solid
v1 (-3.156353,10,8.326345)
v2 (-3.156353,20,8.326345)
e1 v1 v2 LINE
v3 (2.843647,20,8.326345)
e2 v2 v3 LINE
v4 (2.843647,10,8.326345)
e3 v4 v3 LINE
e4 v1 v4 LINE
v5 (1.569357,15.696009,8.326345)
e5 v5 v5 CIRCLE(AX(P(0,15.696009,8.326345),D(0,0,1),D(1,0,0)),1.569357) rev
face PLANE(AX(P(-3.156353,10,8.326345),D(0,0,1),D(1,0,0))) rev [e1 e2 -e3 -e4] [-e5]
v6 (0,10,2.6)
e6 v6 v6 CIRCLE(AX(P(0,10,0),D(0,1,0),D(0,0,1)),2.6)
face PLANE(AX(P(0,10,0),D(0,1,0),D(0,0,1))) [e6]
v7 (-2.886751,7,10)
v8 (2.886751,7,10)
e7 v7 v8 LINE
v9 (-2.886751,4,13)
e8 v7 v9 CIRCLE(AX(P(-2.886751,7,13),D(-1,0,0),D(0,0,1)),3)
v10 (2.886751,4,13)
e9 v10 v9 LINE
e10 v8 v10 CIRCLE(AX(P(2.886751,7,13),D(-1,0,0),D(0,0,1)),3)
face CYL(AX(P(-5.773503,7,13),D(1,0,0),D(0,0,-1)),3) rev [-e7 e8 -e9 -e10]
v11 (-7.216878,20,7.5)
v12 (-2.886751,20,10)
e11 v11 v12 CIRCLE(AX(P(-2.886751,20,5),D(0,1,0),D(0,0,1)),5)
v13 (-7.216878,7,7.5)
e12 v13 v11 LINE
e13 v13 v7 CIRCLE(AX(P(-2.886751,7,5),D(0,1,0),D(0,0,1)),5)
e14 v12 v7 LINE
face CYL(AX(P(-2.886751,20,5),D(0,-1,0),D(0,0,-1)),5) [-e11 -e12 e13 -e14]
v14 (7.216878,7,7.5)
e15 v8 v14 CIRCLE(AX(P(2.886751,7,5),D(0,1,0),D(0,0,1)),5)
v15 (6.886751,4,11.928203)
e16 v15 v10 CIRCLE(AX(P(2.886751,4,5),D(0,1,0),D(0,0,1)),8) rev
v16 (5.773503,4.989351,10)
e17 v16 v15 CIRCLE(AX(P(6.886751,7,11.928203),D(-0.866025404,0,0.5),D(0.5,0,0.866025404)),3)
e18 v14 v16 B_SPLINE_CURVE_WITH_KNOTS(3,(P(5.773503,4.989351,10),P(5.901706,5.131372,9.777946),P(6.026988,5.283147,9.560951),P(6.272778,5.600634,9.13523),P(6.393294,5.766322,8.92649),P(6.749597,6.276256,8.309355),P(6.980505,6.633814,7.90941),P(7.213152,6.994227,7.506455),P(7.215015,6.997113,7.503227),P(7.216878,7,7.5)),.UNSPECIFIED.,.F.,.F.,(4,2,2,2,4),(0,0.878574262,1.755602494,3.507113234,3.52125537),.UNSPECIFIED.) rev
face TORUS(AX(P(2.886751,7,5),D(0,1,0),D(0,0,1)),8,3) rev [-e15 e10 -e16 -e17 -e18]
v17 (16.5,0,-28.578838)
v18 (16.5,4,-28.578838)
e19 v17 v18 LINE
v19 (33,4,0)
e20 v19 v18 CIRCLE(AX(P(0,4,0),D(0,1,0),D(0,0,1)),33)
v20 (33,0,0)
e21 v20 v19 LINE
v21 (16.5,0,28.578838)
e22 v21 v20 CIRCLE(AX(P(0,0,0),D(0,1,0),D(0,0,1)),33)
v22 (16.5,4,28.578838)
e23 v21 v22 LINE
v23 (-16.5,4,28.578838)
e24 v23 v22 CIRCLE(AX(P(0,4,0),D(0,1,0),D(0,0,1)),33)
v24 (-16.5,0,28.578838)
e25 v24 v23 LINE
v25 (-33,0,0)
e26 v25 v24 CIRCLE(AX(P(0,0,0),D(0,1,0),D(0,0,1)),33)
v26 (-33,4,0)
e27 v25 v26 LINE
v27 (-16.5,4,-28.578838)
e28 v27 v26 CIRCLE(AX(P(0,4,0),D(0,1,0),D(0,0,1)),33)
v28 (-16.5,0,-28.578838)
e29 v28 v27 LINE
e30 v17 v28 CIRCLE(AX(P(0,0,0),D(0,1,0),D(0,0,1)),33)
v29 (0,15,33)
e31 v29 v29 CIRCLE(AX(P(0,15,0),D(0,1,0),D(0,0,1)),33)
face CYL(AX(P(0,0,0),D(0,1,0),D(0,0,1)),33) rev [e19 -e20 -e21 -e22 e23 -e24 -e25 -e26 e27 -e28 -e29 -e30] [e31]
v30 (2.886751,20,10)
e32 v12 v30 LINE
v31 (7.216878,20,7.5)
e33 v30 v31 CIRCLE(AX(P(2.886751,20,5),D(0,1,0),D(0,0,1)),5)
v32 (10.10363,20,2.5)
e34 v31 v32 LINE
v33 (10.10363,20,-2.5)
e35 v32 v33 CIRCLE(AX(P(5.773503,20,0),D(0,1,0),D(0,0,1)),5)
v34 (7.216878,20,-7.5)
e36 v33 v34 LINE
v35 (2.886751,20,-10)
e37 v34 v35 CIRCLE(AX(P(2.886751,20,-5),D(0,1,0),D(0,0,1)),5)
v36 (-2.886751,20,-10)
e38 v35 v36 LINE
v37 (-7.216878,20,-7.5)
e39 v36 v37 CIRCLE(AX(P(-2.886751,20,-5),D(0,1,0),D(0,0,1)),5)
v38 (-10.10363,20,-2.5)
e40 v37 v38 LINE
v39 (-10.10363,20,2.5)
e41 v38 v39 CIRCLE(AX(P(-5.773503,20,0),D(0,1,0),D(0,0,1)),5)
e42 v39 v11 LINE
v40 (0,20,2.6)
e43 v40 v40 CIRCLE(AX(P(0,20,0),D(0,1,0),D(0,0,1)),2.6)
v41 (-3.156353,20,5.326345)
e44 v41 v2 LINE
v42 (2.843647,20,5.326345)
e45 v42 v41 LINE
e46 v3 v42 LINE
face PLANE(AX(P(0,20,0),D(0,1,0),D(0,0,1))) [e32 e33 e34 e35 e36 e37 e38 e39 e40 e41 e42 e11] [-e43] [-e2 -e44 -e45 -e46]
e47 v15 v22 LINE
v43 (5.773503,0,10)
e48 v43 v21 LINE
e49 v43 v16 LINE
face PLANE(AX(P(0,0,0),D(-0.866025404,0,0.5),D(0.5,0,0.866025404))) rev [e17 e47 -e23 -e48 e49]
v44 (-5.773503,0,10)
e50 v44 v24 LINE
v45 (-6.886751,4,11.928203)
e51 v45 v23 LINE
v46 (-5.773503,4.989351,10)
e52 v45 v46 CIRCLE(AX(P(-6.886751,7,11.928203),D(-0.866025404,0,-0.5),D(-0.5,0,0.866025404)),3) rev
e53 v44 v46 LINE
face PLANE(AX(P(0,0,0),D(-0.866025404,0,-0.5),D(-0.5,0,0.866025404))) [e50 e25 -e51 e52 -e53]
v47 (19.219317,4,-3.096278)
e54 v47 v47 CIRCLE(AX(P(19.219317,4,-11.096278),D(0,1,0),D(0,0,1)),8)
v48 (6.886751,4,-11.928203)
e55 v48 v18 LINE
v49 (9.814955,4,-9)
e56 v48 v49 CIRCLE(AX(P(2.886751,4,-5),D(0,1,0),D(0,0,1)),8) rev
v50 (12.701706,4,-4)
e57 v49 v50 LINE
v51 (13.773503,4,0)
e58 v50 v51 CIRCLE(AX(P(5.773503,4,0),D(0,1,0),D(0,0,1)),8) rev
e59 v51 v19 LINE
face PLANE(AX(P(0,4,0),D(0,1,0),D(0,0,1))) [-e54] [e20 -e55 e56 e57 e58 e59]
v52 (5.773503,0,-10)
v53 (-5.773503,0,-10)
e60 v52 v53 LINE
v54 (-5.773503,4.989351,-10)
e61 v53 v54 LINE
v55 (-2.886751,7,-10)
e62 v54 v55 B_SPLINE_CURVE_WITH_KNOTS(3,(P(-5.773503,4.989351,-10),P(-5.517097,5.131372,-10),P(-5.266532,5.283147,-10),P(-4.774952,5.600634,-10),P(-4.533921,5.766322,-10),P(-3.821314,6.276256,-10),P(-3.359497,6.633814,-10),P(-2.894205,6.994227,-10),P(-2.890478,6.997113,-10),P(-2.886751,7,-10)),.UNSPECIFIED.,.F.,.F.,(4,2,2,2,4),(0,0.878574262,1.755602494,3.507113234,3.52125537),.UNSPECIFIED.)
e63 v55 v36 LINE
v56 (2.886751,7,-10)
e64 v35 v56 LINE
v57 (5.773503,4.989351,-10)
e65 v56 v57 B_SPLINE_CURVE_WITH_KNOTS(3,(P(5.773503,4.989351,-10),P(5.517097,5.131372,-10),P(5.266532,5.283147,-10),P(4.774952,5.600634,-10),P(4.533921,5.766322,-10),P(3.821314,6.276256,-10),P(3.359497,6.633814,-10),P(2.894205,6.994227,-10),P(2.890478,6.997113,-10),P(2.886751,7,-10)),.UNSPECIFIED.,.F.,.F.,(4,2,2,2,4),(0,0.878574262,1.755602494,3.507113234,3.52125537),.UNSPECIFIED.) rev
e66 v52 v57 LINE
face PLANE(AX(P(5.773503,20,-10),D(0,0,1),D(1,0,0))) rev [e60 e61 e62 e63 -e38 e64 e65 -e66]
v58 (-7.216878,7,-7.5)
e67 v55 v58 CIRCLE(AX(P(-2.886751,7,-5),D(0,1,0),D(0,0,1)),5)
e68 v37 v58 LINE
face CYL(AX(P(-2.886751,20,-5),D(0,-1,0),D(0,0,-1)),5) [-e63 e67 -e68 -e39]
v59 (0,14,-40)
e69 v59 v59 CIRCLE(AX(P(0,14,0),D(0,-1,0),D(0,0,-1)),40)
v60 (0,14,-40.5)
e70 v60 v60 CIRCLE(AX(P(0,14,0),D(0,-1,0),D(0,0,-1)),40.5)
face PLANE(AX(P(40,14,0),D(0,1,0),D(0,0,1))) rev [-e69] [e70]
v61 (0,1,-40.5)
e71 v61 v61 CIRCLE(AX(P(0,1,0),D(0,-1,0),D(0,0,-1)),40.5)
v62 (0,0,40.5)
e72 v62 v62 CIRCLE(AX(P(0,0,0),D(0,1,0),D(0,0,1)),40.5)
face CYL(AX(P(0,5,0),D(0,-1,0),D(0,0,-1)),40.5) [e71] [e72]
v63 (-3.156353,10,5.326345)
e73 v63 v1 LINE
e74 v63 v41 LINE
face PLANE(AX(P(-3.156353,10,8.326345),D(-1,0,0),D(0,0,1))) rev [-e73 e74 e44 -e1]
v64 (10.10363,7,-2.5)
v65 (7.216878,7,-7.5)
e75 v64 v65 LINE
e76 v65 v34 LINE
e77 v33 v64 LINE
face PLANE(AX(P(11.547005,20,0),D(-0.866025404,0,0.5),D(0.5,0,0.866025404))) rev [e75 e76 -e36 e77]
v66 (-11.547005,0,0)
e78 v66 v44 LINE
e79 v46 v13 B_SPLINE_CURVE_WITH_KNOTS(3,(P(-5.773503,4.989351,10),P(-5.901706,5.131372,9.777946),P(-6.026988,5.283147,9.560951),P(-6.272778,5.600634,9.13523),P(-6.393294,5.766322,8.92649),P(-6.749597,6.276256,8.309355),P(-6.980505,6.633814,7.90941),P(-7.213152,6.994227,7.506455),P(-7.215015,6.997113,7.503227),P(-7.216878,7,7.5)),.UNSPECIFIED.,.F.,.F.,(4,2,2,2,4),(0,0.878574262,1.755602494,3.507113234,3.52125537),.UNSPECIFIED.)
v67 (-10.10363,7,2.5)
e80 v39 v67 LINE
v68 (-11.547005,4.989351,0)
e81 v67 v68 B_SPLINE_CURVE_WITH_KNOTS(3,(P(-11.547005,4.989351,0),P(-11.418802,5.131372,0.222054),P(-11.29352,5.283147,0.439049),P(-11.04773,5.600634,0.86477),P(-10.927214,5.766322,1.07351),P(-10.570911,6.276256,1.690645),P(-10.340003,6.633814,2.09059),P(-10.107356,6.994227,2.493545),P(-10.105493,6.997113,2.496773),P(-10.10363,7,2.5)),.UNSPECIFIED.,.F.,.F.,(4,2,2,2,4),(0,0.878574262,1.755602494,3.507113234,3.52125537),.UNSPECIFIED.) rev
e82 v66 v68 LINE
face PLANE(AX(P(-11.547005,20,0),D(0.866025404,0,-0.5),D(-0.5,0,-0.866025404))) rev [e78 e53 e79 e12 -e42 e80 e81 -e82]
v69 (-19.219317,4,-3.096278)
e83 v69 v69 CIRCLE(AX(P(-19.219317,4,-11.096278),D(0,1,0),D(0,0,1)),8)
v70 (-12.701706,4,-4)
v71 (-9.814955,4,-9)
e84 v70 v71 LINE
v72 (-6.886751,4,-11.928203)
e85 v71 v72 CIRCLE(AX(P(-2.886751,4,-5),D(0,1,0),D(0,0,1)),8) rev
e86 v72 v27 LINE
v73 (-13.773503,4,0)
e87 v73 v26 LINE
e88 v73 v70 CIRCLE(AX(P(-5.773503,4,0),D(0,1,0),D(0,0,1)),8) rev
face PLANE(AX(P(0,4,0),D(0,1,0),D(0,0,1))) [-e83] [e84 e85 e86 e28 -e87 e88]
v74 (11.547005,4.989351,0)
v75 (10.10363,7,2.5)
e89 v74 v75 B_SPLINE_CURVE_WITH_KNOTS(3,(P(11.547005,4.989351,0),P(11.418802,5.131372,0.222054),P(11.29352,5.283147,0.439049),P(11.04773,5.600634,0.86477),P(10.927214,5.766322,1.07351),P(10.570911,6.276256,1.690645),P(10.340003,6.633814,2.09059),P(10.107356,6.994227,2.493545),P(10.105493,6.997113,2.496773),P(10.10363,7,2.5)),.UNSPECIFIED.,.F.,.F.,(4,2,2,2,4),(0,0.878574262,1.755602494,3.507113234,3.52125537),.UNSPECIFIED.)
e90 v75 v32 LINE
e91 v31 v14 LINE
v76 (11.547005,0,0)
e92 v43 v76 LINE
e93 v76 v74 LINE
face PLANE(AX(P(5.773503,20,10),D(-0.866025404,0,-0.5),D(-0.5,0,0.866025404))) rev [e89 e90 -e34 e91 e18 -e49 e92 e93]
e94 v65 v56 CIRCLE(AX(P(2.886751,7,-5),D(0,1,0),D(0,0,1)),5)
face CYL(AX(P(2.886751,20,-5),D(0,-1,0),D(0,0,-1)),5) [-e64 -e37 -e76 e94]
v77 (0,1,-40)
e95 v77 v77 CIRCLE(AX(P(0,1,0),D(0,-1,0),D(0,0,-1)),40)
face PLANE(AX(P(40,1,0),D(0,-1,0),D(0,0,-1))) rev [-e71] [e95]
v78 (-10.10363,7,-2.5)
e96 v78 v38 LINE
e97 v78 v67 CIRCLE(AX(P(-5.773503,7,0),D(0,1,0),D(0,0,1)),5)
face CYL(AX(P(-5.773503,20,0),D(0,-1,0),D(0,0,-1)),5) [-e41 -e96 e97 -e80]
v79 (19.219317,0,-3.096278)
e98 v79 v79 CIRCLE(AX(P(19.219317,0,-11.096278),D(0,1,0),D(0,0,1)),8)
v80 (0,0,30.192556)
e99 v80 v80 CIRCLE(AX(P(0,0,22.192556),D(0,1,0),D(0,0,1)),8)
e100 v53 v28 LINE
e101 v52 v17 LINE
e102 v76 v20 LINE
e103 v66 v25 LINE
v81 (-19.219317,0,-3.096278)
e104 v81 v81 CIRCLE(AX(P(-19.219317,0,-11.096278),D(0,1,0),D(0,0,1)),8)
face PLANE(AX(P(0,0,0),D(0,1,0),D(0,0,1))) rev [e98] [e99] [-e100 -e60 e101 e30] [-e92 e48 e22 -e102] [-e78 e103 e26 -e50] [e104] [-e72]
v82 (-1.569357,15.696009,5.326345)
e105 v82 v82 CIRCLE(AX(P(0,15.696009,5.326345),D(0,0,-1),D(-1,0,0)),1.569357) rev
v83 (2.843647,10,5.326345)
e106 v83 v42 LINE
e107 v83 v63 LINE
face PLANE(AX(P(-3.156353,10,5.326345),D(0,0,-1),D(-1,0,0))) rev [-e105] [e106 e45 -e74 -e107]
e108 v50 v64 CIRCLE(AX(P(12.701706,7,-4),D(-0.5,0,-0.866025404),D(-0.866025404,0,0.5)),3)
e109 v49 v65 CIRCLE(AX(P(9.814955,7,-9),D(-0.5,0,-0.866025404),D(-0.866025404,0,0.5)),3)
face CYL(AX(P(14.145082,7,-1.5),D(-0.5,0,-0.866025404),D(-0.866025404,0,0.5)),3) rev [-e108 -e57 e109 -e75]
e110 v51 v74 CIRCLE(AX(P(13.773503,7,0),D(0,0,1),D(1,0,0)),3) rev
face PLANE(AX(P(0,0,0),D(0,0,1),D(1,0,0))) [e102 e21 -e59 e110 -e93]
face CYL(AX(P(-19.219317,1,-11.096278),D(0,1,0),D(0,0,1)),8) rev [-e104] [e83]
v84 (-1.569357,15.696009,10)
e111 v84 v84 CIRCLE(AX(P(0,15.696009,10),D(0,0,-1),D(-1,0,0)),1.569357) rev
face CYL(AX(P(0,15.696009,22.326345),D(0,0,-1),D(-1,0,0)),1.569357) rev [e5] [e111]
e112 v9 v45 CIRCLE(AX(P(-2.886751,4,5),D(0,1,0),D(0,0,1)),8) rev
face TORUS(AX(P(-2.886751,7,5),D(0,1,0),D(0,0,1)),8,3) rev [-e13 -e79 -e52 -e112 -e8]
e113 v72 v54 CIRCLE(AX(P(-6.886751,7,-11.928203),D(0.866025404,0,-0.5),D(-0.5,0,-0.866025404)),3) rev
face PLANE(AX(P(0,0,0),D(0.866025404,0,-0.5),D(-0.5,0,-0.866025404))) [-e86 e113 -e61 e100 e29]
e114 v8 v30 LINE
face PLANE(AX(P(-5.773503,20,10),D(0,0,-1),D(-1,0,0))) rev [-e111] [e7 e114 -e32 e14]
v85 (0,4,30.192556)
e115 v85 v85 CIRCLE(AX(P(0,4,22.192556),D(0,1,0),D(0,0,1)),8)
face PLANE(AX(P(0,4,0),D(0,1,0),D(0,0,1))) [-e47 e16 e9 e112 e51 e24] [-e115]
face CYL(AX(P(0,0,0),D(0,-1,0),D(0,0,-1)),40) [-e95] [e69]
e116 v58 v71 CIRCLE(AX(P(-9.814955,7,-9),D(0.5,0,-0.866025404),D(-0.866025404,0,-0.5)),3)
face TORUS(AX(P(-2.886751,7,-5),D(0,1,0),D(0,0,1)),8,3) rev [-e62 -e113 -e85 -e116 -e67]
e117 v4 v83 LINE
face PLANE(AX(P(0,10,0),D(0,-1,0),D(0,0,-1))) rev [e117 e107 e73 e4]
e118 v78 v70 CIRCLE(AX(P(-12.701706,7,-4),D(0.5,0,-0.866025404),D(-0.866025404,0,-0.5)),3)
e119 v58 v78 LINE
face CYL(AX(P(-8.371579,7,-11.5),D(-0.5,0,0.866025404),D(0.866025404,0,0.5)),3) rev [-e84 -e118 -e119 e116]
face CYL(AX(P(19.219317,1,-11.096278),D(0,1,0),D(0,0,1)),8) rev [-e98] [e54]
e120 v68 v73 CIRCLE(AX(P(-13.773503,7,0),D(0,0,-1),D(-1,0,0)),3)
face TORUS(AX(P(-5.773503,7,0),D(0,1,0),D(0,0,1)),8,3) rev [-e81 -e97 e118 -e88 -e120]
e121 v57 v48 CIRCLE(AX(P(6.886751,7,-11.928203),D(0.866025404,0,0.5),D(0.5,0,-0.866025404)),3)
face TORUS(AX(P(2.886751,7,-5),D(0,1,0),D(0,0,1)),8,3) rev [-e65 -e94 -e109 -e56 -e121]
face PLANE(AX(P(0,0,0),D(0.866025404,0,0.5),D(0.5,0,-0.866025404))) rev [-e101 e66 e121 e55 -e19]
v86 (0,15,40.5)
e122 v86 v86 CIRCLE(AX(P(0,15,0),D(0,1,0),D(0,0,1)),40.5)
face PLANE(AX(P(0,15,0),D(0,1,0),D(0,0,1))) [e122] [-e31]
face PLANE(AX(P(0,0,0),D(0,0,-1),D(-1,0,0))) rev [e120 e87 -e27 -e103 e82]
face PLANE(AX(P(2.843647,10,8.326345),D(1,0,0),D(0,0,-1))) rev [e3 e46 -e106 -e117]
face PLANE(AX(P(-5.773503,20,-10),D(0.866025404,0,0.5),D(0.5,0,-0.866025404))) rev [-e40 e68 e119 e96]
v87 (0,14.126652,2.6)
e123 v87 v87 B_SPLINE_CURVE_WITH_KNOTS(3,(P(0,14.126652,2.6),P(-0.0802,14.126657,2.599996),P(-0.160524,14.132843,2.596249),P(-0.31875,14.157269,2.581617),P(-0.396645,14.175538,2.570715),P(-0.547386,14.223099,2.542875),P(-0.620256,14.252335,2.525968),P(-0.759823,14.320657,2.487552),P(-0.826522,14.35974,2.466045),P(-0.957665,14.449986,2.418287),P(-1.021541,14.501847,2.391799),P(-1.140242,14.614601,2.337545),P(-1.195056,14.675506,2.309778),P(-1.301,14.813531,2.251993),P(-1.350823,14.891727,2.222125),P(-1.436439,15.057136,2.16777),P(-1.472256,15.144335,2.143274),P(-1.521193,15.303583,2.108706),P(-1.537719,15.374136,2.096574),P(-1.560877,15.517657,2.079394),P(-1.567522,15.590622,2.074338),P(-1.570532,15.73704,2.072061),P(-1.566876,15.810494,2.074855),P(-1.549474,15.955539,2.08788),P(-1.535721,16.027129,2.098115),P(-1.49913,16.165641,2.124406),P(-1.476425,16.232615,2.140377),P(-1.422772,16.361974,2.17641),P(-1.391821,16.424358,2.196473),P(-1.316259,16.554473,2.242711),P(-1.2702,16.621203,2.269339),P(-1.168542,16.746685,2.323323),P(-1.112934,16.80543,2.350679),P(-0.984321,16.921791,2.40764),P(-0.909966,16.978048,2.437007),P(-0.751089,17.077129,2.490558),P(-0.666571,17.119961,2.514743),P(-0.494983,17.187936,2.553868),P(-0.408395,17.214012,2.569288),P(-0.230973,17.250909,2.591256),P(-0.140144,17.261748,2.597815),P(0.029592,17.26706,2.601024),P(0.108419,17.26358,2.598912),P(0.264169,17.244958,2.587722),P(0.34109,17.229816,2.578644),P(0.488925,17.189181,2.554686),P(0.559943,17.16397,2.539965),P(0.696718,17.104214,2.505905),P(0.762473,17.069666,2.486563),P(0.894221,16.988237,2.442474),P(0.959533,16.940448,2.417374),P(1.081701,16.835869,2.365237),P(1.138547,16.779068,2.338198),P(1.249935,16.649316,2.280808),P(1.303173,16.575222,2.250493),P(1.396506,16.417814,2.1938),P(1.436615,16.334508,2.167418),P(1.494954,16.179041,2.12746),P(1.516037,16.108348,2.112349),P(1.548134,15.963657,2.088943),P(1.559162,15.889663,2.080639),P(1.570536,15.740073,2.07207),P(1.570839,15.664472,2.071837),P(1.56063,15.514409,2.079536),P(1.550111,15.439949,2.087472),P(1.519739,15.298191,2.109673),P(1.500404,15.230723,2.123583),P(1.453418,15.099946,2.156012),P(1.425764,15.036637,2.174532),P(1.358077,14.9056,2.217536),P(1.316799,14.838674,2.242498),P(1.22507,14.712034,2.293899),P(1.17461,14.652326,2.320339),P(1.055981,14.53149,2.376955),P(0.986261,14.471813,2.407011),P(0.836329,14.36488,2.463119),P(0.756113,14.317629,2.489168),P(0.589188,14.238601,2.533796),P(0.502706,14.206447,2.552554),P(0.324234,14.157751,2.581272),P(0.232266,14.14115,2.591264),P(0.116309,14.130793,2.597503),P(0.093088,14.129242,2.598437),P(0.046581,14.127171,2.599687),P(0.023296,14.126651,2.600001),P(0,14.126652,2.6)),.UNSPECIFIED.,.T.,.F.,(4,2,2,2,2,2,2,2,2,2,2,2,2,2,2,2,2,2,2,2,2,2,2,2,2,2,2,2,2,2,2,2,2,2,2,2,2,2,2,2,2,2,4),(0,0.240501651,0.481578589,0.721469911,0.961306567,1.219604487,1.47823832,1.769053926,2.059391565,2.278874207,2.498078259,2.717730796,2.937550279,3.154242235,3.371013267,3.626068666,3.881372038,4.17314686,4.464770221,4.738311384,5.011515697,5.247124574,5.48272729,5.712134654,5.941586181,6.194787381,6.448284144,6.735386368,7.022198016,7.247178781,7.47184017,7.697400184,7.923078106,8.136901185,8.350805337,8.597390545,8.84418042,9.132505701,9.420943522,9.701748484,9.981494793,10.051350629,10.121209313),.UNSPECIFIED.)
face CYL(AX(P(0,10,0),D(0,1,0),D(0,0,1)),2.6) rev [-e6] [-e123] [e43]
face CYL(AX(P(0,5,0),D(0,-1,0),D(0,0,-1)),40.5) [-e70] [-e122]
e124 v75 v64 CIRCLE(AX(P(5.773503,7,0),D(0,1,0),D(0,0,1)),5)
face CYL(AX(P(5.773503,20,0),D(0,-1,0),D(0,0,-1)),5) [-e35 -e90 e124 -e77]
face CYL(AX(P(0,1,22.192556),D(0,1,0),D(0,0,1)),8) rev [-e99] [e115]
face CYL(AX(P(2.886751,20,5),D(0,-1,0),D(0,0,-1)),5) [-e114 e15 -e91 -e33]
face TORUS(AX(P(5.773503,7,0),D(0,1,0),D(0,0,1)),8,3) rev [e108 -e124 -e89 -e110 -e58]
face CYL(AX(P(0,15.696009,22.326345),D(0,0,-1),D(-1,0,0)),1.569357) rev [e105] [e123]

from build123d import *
from build123d.topology import SkipClean

# Parameters (mm, degrees)
SKETCH1_R                = 40.5
BOSS_EXTRUDE16_DEPTH     = 5
SKETCH1_23_R             = 5
BOSS_EXTRUDE17_DEPTH     = 5
CUT_EXTRUDE6_DEPTH       = 15
CUT_EXTRUDE7_DEPTH       = 5
CUT_EXTRUDE8_DEPTH       = 5
CUT_EXTRUDE9_DEPTH       = 5
BOSS_EXTRUDE19_DEPTH     = 5
CUT_EXTRUDE14_DEPTH      = 1
SKETCH24_R               = 8
CUT_EXTRUDE15_DEPTH      = 4
SKETCH24_2_R             = 8
CUT_EXTRUDE16_DEPTH      = 6
BOSS_EXTRUDE21_START     = -1
SKETCH30_R               = 40
SKETCH30_R_2             = 33
BOSS_EXTRUDE21_DEPTH     = 1
BOSS_EXTRUDE22_DEPTH     = 15
SKETCH33_R               = 2.6
CUT_EXTRUDE17_DEPTH      = 10
SKETCH35_W               = 6
SKETCH35_H               = 3
CUT_EXTRUDE18_DEPTH      = 10
CUT_EXTRUDE19_DEPTH      = 17
CUT_EXTRUDE19_DEPTH_BACK = 5
SKETCH36_R               = 1.569356798
SKETCH37_R               = 40.5
SKETCH37_R_2             = 33
BOSS_EXTRUDE23_DEPTH     = 10
SKETCH39_W               = 0.5
SKETCH39_H               = 13
BOSS_EXTRUDE25_DEPTH     = 5
FILLET2_R                = 5
FILLET3_R                = 3


with BuildPart() as part:
    # Sketch1 → Boss-Extrude16 (new body)
    with BuildSketch(Plane(origin=(0, 0, 0), x_dir=(1, 0, 0), z_dir=(0, 1, 0))):
        with Locations(Location((0, 0, 0), (0, 0, 270))):
            Circle(SKETCH1_R)
    extrude(amount=BOSS_EXTRUDE16_DEPTH)

    # Sketch1<23> → Boss-Extrude17 (add)
    with BuildSketch(Plane(origin=(0, 0, 0), x_dir=(1, 0, 0), z_dir=(0, 1, 0))):
        Circle(SKETCH1_23_R)
    extrude(amount=BOSS_EXTRUDE17_DEPTH)

    # Sketch1<29> → Cut-Extrude6 (cut)
    with BuildSketch(Plane(origin=(0, 0, 0), x_dir=(1, 0, 0), z_dir=(0, 1, 0))):
        with BuildLine():
            ThreePointArc((1.209994132, 1.5924554), (0.148641183, -1.994468801), (-1.43267703, 1.395505833))
            Line((-1.43267703, 1.395505833), (1.209994132, 1.5924554))
        make_face()
    extrude(amount=CUT_EXTRUDE6_DEPTH, mode=Mode.SUBTRACT)

    # Sketch13 → Cut-Extrude7 (cut)
    with BuildSketch(Plane(origin=(0, 5, 0), x_dir=(1, 0, 0), z_dir=(0, 1, 0))):
        with BuildLine():
            Line((-16.5, 28.578838325), (-3.827980833, 6.630257293))
            Line((-3.827980833, 6.630257293), (-3e-09, 6.630257293))
            Line((-3e-09, 6.630257293), (3.827980833, 6.630257293))
            Line((3.827980833, 6.630257293), (16.5, 28.578838325))
            ThreePointArc((16.5, 28.578838325), (8.541028451, 31.875552278), (-7.8e-08, 33))
            ThreePointArc((-7.8e-08, 33), (-8.541028526, 31.875552257), (-16.5, 28.578838325))
        make_face()
    extrude(amount=-CUT_EXTRUDE7_DEPTH, mode=Mode.SUBTRACT)

    # Sketch13<4> → Cut-Extrude8 (cut)
    with BuildSketch(Plane(origin=(0, 5, 0), x_dir=(1, 0, 0), z_dir=(0, 1, 0))):
        with BuildLine():
            Line((-5.741971189, -3.315128752), (-7.655961666, 0))
            Line((-7.655961666, 0), (-33, 0))
            ThreePointArc((-33, 0), (-31.875552302, -8.541028358), (-28.578838459, -16.499999767))
            ThreePointArc((-28.578838459, -16.499999767), (-23.334523874, -23.334523684), (-16.5, -28.578838325))
            Line((-16.5, -28.578838325), (-3.827980833, -6.630257293))
            Line((-3.827980833, -6.630257293), (-5.741971189, -3.315128752))
        make_face()
    extrude(amount=-CUT_EXTRUDE8_DEPTH, mode=Mode.SUBTRACT)

    # Sketch13<5> → Cut-Extrude9 (cut)
    with BuildSketch(Plane(origin=(0, 5, 0), x_dir=(1, 0, 0), z_dir=(0, 1, 0))):
        with BuildLine():
            Line((33, 0), (7.655961666, 0))
            Line((7.655961666, 0), (5.741971178, -3.31512877))
            Line((5.741971178, -3.31512877), (3.827980833, -6.630257293))
            Line((3.827980833, -6.630257293), (16.5, -28.578838325))
            ThreePointArc((16.5, -28.578838325), (23.334523686, -23.334523872), (28.578838193, -16.500000228))
            ThreePointArc((28.578838193, -16.500000228), (31.875552233, -8.541028616), (33, 0))
        make_face()
    extrude(amount=-CUT_EXTRUDE9_DEPTH, mode=Mode.SUBTRACT)

    # Sketch1<32> → Boss-Extrude19 (add)
    with BuildSketch(Plane(origin=(0, 0, 0), x_dir=(1, 0, 0), z_dir=(0, 1, 0))):
        with BuildLine():
            ThreePointArc((1.209994132, 1.5924554), (0.148641183, -1.994468801), (-1.43267703, 1.395505833))
            Line((-1.43267703, 1.395505833), (1.209994132, 1.5924554))
        make_face()
    extrude(amount=BOSS_EXTRUDE19_DEPTH)

    # Sketch13<11> → Cut-Extrude14 (cut)
    with BuildSketch(Plane(origin=(0, 5, 0), x_dir=(1, 0, 0), z_dir=(0, 1, 0))):
        with BuildLine():
            Line((-7.655961666, 0), (-3.827980833, 6.630257293))
            Line((-3.827980833, 6.630257293), (-16.5, 28.578838325))
            ThreePointArc((-16.5, 28.578838325), (-28.578838325, 16.5), (-33, 0))
            Line((-33, 0), (-7.655961666, 0))
        make_face()
        with BuildLine():
            Line((16.5, 28.578838325), (3.827980833, 6.630257293))
            Line((3.827980833, 6.630257293), (7.655961666, 0))
            Line((7.655961666, 0), (33, 0))
            ThreePointArc((33, 0), (28.578838325, 16.5), (16.5, 28.578838325))
        make_face()
        with BuildLine():
            Line((3.827980833, -6.630257293), (-3.827980833, -6.630257293))
            Line((-3.827980833, -6.630257293), (-16.5, -28.578838325))
            ThreePointArc((-16.5, -28.578838325), (0, -33), (16.5, -28.578838325))
            Line((16.5, -28.578838325), (3.827980833, -6.630257293))
        make_face()
    extrude(amount=-CUT_EXTRUDE14_DEPTH, mode=Mode.SUBTRACT)

    # Sketch24 → Cut-Extrude15 (cut)
    with BuildSketch(Plane(origin=(0, 5, 0), x_dir=(1, 0, 0), z_dir=(0, 1, 0))):
        with Locations(Location((0, -22.192555868, 0), (0, 0, 270))):
            Circle(SKETCH24_R)
        with Locations(Location((19.219317157, 11.096277934, 0), (0, 0, 270))):
            Circle(SKETCH24_R)
        with Locations(Location((-19.219317157, 11.096277934, 0), (0, 0, 270))):
            Circle(SKETCH24_R)
    extrude(amount=-CUT_EXTRUDE15_DEPTH, mode=Mode.SUBTRACT)

    # Sketch24<2> → Cut-Extrude16 (cut)
    with BuildSketch(Plane(origin=(0, 5, 0), x_dir=(1, 0, 0), z_dir=(0, 1, 0))):
        with Locations(Location((0, -22.192555868, 0), (0, 0, 270))):
            Circle(SKETCH24_2_R)
        with Locations(Location((19.219317157, 11.096277934, 0), (0, 0, 270))):
            Circle(SKETCH24_2_R)
        with Locations(Location((-19.219317157, 11.096277934, 0), (0, 0, 270))):
            Circle(SKETCH24_2_R)
    extrude(amount=-CUT_EXTRUDE16_DEPTH, mode=Mode.SUBTRACT)

    # Sketch30 → Boss-Extrude21 (add)
    with BuildSketch(Plane.XZ.offset(BOSS_EXTRUDE21_START)):
        Circle(SKETCH30_R)
        with Locations(Location((0, 0, 0), (0, 0, 90))):
            Circle(SKETCH30_R_2, mode=Mode.SUBTRACT)
    extrude(amount=BOSS_EXTRUDE21_DEPTH)

    # Sketch31 → Boss-Extrude22 (add)
    with BuildSketch(Plane(origin=(0, 5, 0), x_dir=(1, 0, 0), z_dir=(0, 1, 0))):
        Polygon((11.547005384, 0), (5.773502692, 10), (-5.773502692, 10), (-11.547005384, 0), (-5.773502692, -10), (5.773502692, -10), align=None)
    extrude(amount=BOSS_EXTRUDE22_DEPTH)

    # Sketch33 → Cut-Extrude17 (cut)
    with BuildSketch(Plane(origin=(0, 20, 0), x_dir=(1, 0, 0), z_dir=(0, 1, 0))):
        with Locations(Location((0, 0, 0), (0, 0, 270))):
            Circle(SKETCH33_R)
    extrude(amount=-CUT_EXTRUDE17_DEPTH, mode=Mode.SUBTRACT)

    # Sketch35 → Cut-Extrude18 (cut)
    with BuildSketch(Plane(origin=(0, 20, 0), x_dir=(1, 0, 0), z_dir=(0, 1, 0))):
        with Locations((-0.156352746, -6.826345259)):
            Rectangle(SKETCH35_W, SKETCH35_H)
    extrude(amount=-CUT_EXTRUDE18_DEPTH, mode=Mode.SUBTRACT)

    # Sketch36 → Cut-Extrude19 (cut, two sides: drawn at the far end of the back side and taken through both)
    with BuildSketch(Plane.XY.offset(5.326345259).offset(-CUT_EXTRUDE19_DEPTH_BACK)):
        with Locations(Location((0, 15.69600898, 0), (0, 0, 180))):
            Circle(SKETCH36_R)
    extrude(amount=CUT_EXTRUDE19_DEPTH + CUT_EXTRUDE19_DEPTH_BACK, mode=Mode.SUBTRACT)

    # Sketch37 → Boss-Extrude23 (add)
    with SkipClean():  # the faces are left unmerged after this step: merging them gives an invalid solid
        with BuildSketch(Plane(origin=(0, 5, 0), x_dir=(1, 0, 0), z_dir=(0, 1, 0))):
            with Locations(Location((0, 0, 0), (0, 0, 270))):
                Circle(SKETCH37_R)
            with Locations(Location((0, 0, 0), (0, 0, 270))):
                Circle(SKETCH37_R_2, mode=Mode.SUBTRACT)
        extrude(amount=BOSS_EXTRUDE23_DEPTH)
    add(part.part.scale(1), mode=Mode.REPLACE)  # the faces are merged on a copy

    # Sketch39 → Cut-Revolve1 (revolve, cut)
    with BuildSketch(Plane.XY, mode=Mode.PRIVATE) as cut_revolve1_sk:
        with Locations((40.25, 7.5)):
            Rectangle(SKETCH39_W, SKETCH39_H)
    revolve(cut_revolve1_sk.sketch.rotate(Axis((0, 0, 0), (0, 1, 0)), 90), axis=Axis((0, 0, 0), (0, 1, 0)), mode=Mode.SUBTRACT)

    # Sketch31<3> → Boss-Extrude25 (add)
    with BuildSketch(Plane(origin=(0, 5, 0), x_dir=(1, 0, 0), z_dir=(0, 1, 0))):
        Polygon((11.547005384, 0), (5.773502692, 10), (-5.773502692, 10), (-11.547005384, 0), (-5.773502692, -10), (5.773502692, -10), align=None)
    extrude(amount=-BOSS_EXTRUDE25_DEPTH)

    # Fillet2
    fillet2_edges = [part.edges().sort_by_distance(p)[0] for p in [
        (5.773502692, 12, 10),
        (11.547005384, 12, 0),
        (5.773502692, 12, -10),
        (-5.773502692, 12, -10),
        (-11.547005384, 12, 0),
        (-5.773502692, 12, 10),
    ]]
    fillet(fillet2_edges, radius=FILLET2_R)

    # Fillet3
    # the kernel refuses this fillet: 3 mm, written as the material it adds along each edge
    with BuildSketch(Plane(origin=(2.886751346, 4, 5), x_dir=(0, 0, 1), z_dir=(-1, 0, 0))) as fillet3_piece_1_section:
        with BuildLine():
            CenterArc((5 + FILLET3_R, FILLET3_R), FILLET3_R, 180, 90)
            Line((5 + FILLET3_R, 0), (5, 0))
            Line((5, 0), (5, FILLET3_R))
        make_face()
    fillet3_piece_1 = revolve(axis=Axis((2.886751346, 4, 5), (0, 1, 0)), revolution_arc=145.959010994, mode=Mode.PRIVATE)
    fillet3_piece_1 = split(fillet3_piece_1, bisect_by=Plane(origin=(5.63089288, 5.027584856, 10.247007441), z_dir=(-0.8660254037844389, 0, -0.4999999999999996)), keep=Keep.TOP, mode=Mode.PRIVATE)
    add(fillet3_piece_1)
    with BuildSketch(Plane(origin=(2.886751346, 4, 5), x_dir=(0, 0, 1), z_dir=(-1, 0, 0))) as fillet3_piece_2_section:
        with BuildLine():
            CenterArc((5 + FILLET3_R, FILLET3_R), FILLET3_R, 180, 90)
            Line((5 + FILLET3_R, 0), (5, 0))
            Line((5, 0), (5, FILLET3_R))
        make_face()
    fillet3_piece_2 = revolve(axis=Axis((2.886751346, 4, 5), (0, 1, 0)), revolution_arc=145.959010994, mode=Mode.PRIVATE)
    fillet3_piece_2 = split(fillet3_piece_2, bisect_by=Plane(origin=(6.175606905, 4.190788344, 10.696464926), z_dir=(-0.8660254037844383, 0, 0.5000000000000007)), keep=Keep.TOP, mode=Mode.PRIVATE)
    add(fillet3_piece_2)
    with BuildSketch(Plane(origin=(-2.886751346, 4, 10), x_dir=(0, 1, 0), z_dir=(1, 0, 0)), Plane(origin=(-7.216878365, 4, -7.5), x_dir=(0, 1, 0), z_dir=(-0.49999999999999983, 0, 0.8660254037844388)), Plane(origin=(10.103629711, 4, -2.5), x_dir=(0, 1, 0), z_dir=(-0.5, 0, -0.8660254037844387))) as fillet3_piece_3:
        with BuildLine():
            CenterArc((FILLET3_R, FILLET3_R), FILLET3_R, 180, 90)
            Line((0, FILLET3_R), (0, 0))
            Line((0, 0), (FILLET3_R, 0))
        make_face()
    extrude(amount=5.773502692)
    with BuildSketch(Plane(origin=(-2.886751346, 4, 5), x_dir=(0, 0, 1), z_dir=(1, 0, 0))) as fillet3_piece_4_section:
        with BuildLine():
            CenterArc((5 + FILLET3_R, -FILLET3_R), FILLET3_R, 90, 90)
            Line((5 + FILLET3_R, 0), (5, 0))
            Line((5, 0), (5, -FILLET3_R))
        make_face()
    fillet3_piece_4 = revolve(axis=Axis((-2.886751346, 4, 5), (0, -1, 0)), revolution_arc=145.959010994, mode=Mode.PRIVATE)
    fillet3_piece_4 = split(fillet3_piece_4, bisect_by=Plane(origin=(-5.630892878, 5.02758487, 10.247007444), z_dir=(0.8660254037844386, 0, -0.5000000000000001)), keep=Keep.TOP, mode=Mode.PRIVATE)
    add(fillet3_piece_4)
    with BuildSketch(Plane(origin=(-2.886751346, 4, 5), x_dir=(0, 0, 1), z_dir=(1, 0, 0))) as fillet3_piece_5_section:
        with BuildLine():
            CenterArc((5 + FILLET3_R, -FILLET3_R), FILLET3_R, 90, 90)
            Line((5 + FILLET3_R, 0), (5, 0))
            Line((5, 0), (5, -FILLET3_R))
        make_face()
    fillet3_piece_5 = revolve(axis=Axis((-2.886751346, 4, 5), (0, -1, 0)), revolution_arc=145.959010994, mode=Mode.PRIVATE)
    fillet3_piece_5 = split(fillet3_piece_5, bisect_by=Plane(origin=(-6.175606901, 4.19078831, 10.696464921), z_dir=(0.8660254037844387, 0, 0.49999999999999994)), keep=Keep.TOP, mode=Mode.PRIVATE)
    add(fillet3_piece_5)
    with BuildSketch(Plane(origin=(-5.773502692, 4, 0), x_dir=(-0.8660254037844387, 0, -0.49999999999999967), z_dir=(0.49999999999999967, 0, -0.8660254037844387))) as fillet3_piece_6_section:
        with BuildLine():
            CenterArc((5 + FILLET3_R, FILLET3_R), FILLET3_R, 180, 90)
            Line((5 + FILLET3_R, 0), (5, 0))
            Line((5, 0), (5, FILLET3_R))
        make_face()
    fillet3_piece_6 = revolve(axis=Axis((-5.773502692, 4, 0), (0, 1, 0)), revolution_arc=145.959010994, mode=Mode.PRIVATE)
    fillet3_piece_6 = split(fillet3_piece_6, bisect_by=Plane(origin=(-11.689615196, 5.027584856, -0.247007441), z_dir=(0.8660254037844386, 0, -0.5000000000000001)), keep=Keep.TOP, mode=Mode.PRIVATE)
    add(fillet3_piece_6)
    with BuildSketch(Plane(origin=(-5.773502692, 4, 0), x_dir=(-0.8660254037844387, 0, -0.49999999999999967), z_dir=(0.49999999999999967, 0, -0.8660254037844387))) as fillet3_piece_7_section:
        with BuildLine():
            CenterArc((5 + FILLET3_R, FILLET3_R), FILLET3_R, 180, 90)
            Line((5 + FILLET3_R, 0), (5, 0))
            Line((5, 0), (5, FILLET3_R))
        make_face()
    fillet3_piece_7 = revolve(axis=Axis((-5.773502692, 4, 0), (0, 1, 0)), revolution_arc=145.959010994, mode=Mode.PRIVATE)
    fillet3_piece_7 = split(fillet3_piece_7, bisect_by=Plane(origin=(-12.351213809, 4.190788344, 0), z_dir=(0, 0, -1)), keep=Keep.TOP, mode=Mode.PRIVATE)
    add(fillet3_piece_7)
    with BuildSketch(Plane(origin=(-2.886751346, 4, -5), x_dir=(-0.8660254037844389, 0, -0.49999999999999944), z_dir=(-0.49999999999999944, 0, 0.8660254037844389))) as fillet3_piece_8_section:
        with BuildLine():
            CenterArc((5 + FILLET3_R, -FILLET3_R), FILLET3_R, 90, 90)
            Line((5 + FILLET3_R, 0), (5, 0))
            Line((5, 0), (5, -FILLET3_R))
        make_face()
    fillet3_piece_8 = revolve(axis=Axis((-2.886751346, 4, -5), (0, -1, 0)), revolution_arc=145.959010994, mode=Mode.PRIVATE)
    fillet3_piece_8 = split(fillet3_piece_8, bisect_by=Plane(origin=(-6.05872232, 5.02758487, -10), z_dir=(0, 0, 1)), keep=Keep.TOP, mode=Mode.PRIVATE)
    add(fillet3_piece_8)
    with BuildSketch(Plane(origin=(-2.886751346, 4, -5), x_dir=(-0.8660254037844389, 0, -0.49999999999999944), z_dir=(-0.49999999999999944, 0, 0.8660254037844389))) as fillet3_piece_9_section:
        with BuildLine():
            CenterArc((5 + FILLET3_R, -FILLET3_R), FILLET3_R, 90, 90)
            Line((5 + FILLET3_R, 0), (5, 0))
            Line((5, 0), (5, -FILLET3_R))
        make_face()
    fillet3_piece_9 = revolve(axis=Axis((-2.886751346, 4, -5), (0, -1, 0)), revolution_arc=145.959010994, mode=Mode.PRIVATE)
    fillet3_piece_9 = split(fillet3_piece_9, bisect_by=Plane(origin=(-6.175606901, 4.19078831, -10.696464921), z_dir=(-0.8660254037844384, 0, 0.5000000000000006)), keep=Keep.TOP, mode=Mode.PRIVATE)
    add(fillet3_piece_9)
    with BuildSketch(Plane(origin=(5.773502692, 4, 0), x_dir=(0.8660254037844387, 0, -0.5), z_dir=(-0.5, 0, -0.8660254037844387))) as fillet3_piece_10_section:
        with BuildLine():
            CenterArc((5 + FILLET3_R, -FILLET3_R), FILLET3_R, 90, 90)
            Line((5 + FILLET3_R, 0), (5, 0))
            Line((5, 0), (5, -FILLET3_R))
        make_face()
    fillet3_piece_10 = revolve(axis=Axis((5.773502692, 4, 0), (0, -1, 0)), revolution_arc=145.959010994, mode=Mode.PRIVATE)
    fillet3_piece_10 = split(fillet3_piece_10, bisect_by=Plane(origin=(11.689615789, 5.027589468, -0.247008468), z_dir=(-0.8660254037844389, 0, -0.4999999999999996)), keep=Keep.TOP, mode=Mode.PRIVATE)
    add(fillet3_piece_10)
    with BuildSketch(Plane(origin=(5.773502692, 4, 0), x_dir=(0.8660254037844387, 0, -0.5), z_dir=(-0.5, 0, -0.8660254037844387))) as fillet3_piece_11_section:
        with BuildLine():
            CenterArc((5 + FILLET3_R, -FILLET3_R), FILLET3_R, 90, 90)
            Line((5 + FILLET3_R, 0), (5, 0))
            Line((5, 0), (5, -FILLET3_R))
        make_face()
    fillet3_piece_11 = revolve(axis=Axis((5.773502692, 4, 0), (0, -1, 0)), revolution_arc=145.959010994, mode=Mode.PRIVATE)
    fillet3_piece_11 = split(fillet3_piece_11, bisect_by=Plane(origin=(12.351213805, 4.190788313, 0), z_dir=(0, 0, -1)), keep=Keep.TOP, mode=Mode.PRIVATE)
    add(fillet3_piece_11)
    with BuildSketch(Plane(origin=(2.886751346, 4, -5), x_dir=(0.8660254037844386, 0, -0.5000000000000002), z_dir=(0.5000000000000002, 0, 0.8660254037844386))) as fillet3_piece_12_section:
        with BuildLine():
            CenterArc((5 + FILLET3_R, FILLET3_R), FILLET3_R, 180, 90)
            Line((5 + FILLET3_R, 0), (5, 0))
            Line((5, 0), (5, FILLET3_R))
        make_face()
    fillet3_piece_12 = revolve(axis=Axis((2.886751346, 4, -5), (0, 1, 0)), revolution_arc=145.959010994, mode=Mode.PRIVATE)
    fillet3_piece_12 = split(fillet3_piece_12, bisect_by=Plane(origin=(6.058722307, 5.027584869, -10), z_dir=(0, 0, 1)), keep=Keep.TOP, mode=Mode.PRIVATE)
    add(fillet3_piece_12)
    with BuildSketch(Plane(origin=(2.886751346, 4, -5), x_dir=(0.8660254037844386, 0, -0.5000000000000002), z_dir=(0.5000000000000002, 0, 0.8660254037844386))) as fillet3_piece_13_section:
        with BuildLine():
            CenterArc((5 + FILLET3_R, FILLET3_R), FILLET3_R, 180, 90)
            Line((5 + FILLET3_R, 0), (5, 0))
            Line((5, 0), (5, FILLET3_R))
        make_face()
    fillet3_piece_13 = revolve(axis=Axis((2.886751346, 4, -5), (0, 1, 0)), revolution_arc=145.959010994, mode=Mode.PRIVATE)
    fillet3_piece_13 = split(fillet3_piece_13, bisect_by=Plane(origin=(6.175606895, 4.190788352, -10.69646491), z_dir=(0.8660254037844387, 0, 0.49999999999999994)), keep=Keep.TOP, mode=Mode.PRIVATE)
    add(fillet3_piece_13)


solid = part.part
